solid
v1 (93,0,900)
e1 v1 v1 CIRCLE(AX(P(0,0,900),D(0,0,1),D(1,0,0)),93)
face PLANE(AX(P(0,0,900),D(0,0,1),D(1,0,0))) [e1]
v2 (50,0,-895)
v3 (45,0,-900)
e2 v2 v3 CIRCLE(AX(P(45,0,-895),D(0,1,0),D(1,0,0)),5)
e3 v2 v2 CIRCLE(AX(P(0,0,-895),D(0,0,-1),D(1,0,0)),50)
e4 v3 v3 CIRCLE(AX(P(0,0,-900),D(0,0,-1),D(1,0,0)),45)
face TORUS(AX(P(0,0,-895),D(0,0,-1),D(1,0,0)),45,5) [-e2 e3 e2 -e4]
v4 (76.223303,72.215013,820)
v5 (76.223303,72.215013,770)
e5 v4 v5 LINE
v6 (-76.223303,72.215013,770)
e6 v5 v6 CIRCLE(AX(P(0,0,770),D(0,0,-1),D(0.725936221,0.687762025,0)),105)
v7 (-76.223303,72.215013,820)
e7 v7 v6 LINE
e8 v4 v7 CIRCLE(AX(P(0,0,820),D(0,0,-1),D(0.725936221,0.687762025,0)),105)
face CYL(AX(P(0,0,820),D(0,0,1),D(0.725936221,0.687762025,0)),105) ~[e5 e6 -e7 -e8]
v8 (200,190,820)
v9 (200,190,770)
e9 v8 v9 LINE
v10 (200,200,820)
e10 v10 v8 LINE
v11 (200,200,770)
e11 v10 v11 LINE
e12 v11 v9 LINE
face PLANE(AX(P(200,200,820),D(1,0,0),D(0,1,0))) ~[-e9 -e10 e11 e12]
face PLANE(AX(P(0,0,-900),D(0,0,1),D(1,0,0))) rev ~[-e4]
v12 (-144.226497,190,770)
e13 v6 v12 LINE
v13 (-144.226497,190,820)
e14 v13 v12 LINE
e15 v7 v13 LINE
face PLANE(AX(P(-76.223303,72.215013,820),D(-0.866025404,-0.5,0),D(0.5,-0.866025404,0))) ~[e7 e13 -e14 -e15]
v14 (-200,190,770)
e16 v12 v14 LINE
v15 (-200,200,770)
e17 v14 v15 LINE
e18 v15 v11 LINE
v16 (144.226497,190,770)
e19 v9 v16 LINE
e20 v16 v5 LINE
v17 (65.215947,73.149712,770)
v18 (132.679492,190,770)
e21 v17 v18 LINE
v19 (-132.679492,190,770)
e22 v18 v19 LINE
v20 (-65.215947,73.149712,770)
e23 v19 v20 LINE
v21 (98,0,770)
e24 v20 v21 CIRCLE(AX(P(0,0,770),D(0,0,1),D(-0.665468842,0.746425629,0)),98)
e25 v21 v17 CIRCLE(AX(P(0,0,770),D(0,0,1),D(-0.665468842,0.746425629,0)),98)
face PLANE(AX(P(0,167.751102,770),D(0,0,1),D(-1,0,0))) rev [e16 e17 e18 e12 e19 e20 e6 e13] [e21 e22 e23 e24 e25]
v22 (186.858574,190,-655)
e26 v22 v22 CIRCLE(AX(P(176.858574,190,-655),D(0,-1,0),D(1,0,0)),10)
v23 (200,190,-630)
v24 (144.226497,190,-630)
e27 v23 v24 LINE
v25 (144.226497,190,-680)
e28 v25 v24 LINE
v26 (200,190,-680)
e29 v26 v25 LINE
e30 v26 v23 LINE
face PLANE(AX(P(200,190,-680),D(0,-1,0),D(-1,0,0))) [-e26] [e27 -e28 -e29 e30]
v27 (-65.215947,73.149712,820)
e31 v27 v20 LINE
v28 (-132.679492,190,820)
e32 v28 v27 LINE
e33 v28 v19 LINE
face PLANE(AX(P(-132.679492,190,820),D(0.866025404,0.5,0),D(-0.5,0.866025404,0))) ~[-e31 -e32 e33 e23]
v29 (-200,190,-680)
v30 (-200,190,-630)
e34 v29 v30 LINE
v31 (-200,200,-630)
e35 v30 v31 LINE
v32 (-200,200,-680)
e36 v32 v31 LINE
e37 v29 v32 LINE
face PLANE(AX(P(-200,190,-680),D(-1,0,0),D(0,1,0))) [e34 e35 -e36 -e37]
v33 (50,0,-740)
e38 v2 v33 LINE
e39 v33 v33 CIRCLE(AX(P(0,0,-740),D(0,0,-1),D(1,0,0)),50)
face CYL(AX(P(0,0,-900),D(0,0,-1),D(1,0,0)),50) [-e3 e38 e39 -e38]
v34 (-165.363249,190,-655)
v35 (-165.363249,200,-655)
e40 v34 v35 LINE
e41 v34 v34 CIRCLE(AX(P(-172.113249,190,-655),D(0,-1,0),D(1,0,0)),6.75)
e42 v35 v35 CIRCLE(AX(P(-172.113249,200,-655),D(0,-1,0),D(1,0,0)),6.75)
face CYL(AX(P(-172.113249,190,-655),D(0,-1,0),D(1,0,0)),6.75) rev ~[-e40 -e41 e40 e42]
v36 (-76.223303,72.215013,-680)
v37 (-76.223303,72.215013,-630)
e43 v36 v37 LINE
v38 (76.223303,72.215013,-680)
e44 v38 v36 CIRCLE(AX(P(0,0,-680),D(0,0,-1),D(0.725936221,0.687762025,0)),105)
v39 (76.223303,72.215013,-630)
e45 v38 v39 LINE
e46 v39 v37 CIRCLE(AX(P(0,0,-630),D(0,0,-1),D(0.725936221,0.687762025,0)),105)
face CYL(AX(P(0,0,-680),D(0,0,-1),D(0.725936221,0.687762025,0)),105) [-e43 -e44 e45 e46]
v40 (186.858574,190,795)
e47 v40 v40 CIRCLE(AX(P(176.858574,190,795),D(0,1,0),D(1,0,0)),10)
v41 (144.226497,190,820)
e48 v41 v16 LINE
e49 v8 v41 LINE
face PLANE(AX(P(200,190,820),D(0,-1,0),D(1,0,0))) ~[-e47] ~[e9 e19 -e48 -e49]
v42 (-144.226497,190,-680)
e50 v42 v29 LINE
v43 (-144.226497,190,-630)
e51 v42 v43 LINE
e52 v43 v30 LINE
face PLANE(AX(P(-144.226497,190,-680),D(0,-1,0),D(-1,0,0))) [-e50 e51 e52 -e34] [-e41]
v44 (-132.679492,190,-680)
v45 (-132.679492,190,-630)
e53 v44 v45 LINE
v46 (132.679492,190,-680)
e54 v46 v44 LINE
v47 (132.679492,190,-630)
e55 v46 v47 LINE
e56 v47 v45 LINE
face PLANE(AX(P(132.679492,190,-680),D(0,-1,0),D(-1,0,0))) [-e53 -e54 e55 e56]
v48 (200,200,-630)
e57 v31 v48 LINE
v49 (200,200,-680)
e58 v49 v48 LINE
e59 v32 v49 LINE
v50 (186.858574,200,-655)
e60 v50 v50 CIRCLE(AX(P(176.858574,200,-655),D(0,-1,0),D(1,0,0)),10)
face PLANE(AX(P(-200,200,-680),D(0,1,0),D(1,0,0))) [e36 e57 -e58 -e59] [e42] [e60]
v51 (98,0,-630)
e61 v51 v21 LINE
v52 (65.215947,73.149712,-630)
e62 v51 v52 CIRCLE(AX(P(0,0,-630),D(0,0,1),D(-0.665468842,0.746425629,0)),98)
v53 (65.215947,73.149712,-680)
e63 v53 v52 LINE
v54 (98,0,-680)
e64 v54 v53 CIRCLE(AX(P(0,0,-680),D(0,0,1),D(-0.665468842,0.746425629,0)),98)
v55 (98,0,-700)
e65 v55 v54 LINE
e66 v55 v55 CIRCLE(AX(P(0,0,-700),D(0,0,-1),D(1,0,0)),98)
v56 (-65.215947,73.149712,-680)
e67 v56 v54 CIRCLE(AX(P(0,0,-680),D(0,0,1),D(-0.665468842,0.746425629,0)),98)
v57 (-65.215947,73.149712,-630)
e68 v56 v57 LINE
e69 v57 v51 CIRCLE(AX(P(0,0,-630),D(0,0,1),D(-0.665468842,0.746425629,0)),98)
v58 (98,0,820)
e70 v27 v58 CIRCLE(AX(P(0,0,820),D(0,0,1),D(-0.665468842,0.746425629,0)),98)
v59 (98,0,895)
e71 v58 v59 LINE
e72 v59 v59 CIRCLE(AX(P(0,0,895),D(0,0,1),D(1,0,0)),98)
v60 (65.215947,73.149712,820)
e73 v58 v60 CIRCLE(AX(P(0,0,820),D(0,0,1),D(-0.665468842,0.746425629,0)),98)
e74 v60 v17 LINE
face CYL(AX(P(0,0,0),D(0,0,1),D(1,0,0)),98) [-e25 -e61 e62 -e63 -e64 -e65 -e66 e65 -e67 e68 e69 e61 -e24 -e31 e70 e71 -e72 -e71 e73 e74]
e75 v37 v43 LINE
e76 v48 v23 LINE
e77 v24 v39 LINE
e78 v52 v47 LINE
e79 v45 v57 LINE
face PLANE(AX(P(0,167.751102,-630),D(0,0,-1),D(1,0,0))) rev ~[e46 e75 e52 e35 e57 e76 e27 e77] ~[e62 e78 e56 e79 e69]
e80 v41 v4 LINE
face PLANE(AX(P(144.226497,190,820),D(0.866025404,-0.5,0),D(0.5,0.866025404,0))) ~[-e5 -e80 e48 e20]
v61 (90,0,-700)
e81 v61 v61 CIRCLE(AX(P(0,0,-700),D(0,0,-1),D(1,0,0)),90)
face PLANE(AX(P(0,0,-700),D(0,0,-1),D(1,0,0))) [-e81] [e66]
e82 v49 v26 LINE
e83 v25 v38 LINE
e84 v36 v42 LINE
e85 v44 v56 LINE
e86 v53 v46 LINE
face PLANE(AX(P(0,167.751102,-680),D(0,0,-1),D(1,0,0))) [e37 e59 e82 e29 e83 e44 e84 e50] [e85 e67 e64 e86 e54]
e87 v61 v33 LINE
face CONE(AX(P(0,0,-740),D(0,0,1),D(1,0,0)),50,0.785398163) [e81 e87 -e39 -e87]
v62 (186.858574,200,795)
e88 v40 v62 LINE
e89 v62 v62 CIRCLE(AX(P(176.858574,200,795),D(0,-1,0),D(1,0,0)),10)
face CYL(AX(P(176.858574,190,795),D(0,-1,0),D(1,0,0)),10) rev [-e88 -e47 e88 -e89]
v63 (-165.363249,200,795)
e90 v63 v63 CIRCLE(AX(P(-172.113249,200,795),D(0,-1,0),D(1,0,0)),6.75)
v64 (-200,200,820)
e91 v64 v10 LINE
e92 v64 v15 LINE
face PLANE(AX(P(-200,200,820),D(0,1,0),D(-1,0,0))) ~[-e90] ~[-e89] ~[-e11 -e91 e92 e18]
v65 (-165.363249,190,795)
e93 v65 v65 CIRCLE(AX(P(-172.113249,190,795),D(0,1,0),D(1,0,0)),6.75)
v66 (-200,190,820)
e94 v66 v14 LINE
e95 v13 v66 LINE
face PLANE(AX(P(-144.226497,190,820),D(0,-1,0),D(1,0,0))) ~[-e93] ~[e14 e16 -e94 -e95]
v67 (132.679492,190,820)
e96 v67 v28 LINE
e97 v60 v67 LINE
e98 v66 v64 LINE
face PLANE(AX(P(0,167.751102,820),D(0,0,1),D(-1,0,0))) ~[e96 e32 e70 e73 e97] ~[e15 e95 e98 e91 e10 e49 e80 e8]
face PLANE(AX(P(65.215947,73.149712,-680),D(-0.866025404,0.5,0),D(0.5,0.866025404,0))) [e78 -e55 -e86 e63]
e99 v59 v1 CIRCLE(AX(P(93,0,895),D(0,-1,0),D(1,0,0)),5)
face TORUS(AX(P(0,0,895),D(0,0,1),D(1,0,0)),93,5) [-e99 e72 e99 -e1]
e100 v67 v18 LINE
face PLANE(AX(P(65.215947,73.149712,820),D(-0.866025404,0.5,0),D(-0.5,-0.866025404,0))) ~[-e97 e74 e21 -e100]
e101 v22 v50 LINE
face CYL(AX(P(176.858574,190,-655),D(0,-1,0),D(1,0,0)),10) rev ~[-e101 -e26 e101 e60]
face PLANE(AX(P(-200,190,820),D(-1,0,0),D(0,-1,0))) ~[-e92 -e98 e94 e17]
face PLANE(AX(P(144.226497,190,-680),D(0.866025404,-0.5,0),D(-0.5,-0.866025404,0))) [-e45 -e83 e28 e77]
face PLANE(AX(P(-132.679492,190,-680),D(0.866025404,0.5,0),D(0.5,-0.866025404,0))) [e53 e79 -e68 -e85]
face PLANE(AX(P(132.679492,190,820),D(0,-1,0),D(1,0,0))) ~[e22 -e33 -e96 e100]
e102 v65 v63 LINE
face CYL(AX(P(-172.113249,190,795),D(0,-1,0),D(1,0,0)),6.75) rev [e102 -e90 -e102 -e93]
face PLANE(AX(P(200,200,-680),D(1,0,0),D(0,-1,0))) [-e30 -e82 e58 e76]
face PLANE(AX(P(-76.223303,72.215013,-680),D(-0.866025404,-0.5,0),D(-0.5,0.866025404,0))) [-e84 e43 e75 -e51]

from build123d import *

# Parameters (mm, degrees)
F0_R      = 98
F1_DEPTH  = 900
F2_R      = 98
F2_R_2    = 50
F3_DEPTH  = 200
F4_SIZE   = 40
F5_R      = 5
F8_DEPTH  = 50
F9_R      = 6.75
F9_R_2    = 10
F10_DEPTH = 10.001


# Not quite as in the source:
# - a pattern or mirror of a feature is missing from the dataset's text; its kind, count and spacing are read off the source's solid


with BuildPart() as f1:
    # F0 (on Top) → F1 (new body, symmetric)
    with BuildSketch(Plane.XY):
        Circle(F0_R)
    extrude(amount=F1_DEPTH, both=True)

    # F2 (on face) → F3 (cut)
    with BuildSketch(Plane(origin=(0, 0, -900), x_dir=(1, 0, 0), z_dir=(0, 0, -1))):
        Circle(F2_R)
        Circle(F2_R_2, mode=Mode.SUBTRACT)
    extrude(amount=-F3_DEPTH, mode=Mode.SUBTRACT)

    # F4
    f4_edges = [f1.edges().sort_by_distance(p)[0] for p in [
        (-50, 0, -700),
    ]]
    chamfer(f4_edges, length=F4_SIZE)

    # F5
    f5_edges = [f1.edges().sort_by_distance(p)[0] for p in [
        (-50, 0, -900),
        (-98, 0, 900),
    ]]
    fillet(f5_edges, radius=F5_R)

    # F7 (on offset) → F8 (join)
    with BuildSketch(Plane(origin=(0, 0, -680), x_dir=(1, 0, 0), z_dir=(0, 0, -1))):
        Polygon((76.2233031652, -72.2150126676), (65.2159465136, -73.14971169), (132.6794919243, -190), (-132.6794919243, -190), (-65.2159465136, -73.14971169), (-76.2233031652, -72.2150126676), (-144.2264973081, -190), (-200, -190), (-200, -200), (-150, -200), (150, -200), (200, -200), (200, -190), (144.2264973081, -190), align=None)
        with BuildLine():
            ThreePointArc((-65.2159465136, -73.14971169), (0, 98), (65.2159465136, -73.14971169))
            Line((65.2159465136, -73.14971169), (76.2233031652, -72.2150126676))
            ThreePointArc((76.2233031652, -72.2150126676), (0, 105), (-76.2233031652, -72.2150126676))
            Line((-76.2233031652, -72.2150126676), (-65.2159465136, -73.14971169))
        make_face()
    f8 = extrude(amount=-F8_DEPTH)

    # F8_copies: F8 across plane
    add(f8.mirror(Plane.XY.offset(70)))

    # F9 (on face) → F10 (cut, through all)
    with BuildSketch(Plane.XZ.offset(-190)):
        with Locations((-172.1132486541, -655)):
            Circle(F9_R)
        with Locations((176.858574152, -655)):
            Circle(F9_R_2)
    f10 = extrude(amount=-F10_DEPTH, mode=Mode.SUBTRACT)

    # F10_copies: F10 across plane
    add(f10.mirror(Plane.XY.offset(70)), mode=Mode.SUBTRACT)


solid = f1.part
